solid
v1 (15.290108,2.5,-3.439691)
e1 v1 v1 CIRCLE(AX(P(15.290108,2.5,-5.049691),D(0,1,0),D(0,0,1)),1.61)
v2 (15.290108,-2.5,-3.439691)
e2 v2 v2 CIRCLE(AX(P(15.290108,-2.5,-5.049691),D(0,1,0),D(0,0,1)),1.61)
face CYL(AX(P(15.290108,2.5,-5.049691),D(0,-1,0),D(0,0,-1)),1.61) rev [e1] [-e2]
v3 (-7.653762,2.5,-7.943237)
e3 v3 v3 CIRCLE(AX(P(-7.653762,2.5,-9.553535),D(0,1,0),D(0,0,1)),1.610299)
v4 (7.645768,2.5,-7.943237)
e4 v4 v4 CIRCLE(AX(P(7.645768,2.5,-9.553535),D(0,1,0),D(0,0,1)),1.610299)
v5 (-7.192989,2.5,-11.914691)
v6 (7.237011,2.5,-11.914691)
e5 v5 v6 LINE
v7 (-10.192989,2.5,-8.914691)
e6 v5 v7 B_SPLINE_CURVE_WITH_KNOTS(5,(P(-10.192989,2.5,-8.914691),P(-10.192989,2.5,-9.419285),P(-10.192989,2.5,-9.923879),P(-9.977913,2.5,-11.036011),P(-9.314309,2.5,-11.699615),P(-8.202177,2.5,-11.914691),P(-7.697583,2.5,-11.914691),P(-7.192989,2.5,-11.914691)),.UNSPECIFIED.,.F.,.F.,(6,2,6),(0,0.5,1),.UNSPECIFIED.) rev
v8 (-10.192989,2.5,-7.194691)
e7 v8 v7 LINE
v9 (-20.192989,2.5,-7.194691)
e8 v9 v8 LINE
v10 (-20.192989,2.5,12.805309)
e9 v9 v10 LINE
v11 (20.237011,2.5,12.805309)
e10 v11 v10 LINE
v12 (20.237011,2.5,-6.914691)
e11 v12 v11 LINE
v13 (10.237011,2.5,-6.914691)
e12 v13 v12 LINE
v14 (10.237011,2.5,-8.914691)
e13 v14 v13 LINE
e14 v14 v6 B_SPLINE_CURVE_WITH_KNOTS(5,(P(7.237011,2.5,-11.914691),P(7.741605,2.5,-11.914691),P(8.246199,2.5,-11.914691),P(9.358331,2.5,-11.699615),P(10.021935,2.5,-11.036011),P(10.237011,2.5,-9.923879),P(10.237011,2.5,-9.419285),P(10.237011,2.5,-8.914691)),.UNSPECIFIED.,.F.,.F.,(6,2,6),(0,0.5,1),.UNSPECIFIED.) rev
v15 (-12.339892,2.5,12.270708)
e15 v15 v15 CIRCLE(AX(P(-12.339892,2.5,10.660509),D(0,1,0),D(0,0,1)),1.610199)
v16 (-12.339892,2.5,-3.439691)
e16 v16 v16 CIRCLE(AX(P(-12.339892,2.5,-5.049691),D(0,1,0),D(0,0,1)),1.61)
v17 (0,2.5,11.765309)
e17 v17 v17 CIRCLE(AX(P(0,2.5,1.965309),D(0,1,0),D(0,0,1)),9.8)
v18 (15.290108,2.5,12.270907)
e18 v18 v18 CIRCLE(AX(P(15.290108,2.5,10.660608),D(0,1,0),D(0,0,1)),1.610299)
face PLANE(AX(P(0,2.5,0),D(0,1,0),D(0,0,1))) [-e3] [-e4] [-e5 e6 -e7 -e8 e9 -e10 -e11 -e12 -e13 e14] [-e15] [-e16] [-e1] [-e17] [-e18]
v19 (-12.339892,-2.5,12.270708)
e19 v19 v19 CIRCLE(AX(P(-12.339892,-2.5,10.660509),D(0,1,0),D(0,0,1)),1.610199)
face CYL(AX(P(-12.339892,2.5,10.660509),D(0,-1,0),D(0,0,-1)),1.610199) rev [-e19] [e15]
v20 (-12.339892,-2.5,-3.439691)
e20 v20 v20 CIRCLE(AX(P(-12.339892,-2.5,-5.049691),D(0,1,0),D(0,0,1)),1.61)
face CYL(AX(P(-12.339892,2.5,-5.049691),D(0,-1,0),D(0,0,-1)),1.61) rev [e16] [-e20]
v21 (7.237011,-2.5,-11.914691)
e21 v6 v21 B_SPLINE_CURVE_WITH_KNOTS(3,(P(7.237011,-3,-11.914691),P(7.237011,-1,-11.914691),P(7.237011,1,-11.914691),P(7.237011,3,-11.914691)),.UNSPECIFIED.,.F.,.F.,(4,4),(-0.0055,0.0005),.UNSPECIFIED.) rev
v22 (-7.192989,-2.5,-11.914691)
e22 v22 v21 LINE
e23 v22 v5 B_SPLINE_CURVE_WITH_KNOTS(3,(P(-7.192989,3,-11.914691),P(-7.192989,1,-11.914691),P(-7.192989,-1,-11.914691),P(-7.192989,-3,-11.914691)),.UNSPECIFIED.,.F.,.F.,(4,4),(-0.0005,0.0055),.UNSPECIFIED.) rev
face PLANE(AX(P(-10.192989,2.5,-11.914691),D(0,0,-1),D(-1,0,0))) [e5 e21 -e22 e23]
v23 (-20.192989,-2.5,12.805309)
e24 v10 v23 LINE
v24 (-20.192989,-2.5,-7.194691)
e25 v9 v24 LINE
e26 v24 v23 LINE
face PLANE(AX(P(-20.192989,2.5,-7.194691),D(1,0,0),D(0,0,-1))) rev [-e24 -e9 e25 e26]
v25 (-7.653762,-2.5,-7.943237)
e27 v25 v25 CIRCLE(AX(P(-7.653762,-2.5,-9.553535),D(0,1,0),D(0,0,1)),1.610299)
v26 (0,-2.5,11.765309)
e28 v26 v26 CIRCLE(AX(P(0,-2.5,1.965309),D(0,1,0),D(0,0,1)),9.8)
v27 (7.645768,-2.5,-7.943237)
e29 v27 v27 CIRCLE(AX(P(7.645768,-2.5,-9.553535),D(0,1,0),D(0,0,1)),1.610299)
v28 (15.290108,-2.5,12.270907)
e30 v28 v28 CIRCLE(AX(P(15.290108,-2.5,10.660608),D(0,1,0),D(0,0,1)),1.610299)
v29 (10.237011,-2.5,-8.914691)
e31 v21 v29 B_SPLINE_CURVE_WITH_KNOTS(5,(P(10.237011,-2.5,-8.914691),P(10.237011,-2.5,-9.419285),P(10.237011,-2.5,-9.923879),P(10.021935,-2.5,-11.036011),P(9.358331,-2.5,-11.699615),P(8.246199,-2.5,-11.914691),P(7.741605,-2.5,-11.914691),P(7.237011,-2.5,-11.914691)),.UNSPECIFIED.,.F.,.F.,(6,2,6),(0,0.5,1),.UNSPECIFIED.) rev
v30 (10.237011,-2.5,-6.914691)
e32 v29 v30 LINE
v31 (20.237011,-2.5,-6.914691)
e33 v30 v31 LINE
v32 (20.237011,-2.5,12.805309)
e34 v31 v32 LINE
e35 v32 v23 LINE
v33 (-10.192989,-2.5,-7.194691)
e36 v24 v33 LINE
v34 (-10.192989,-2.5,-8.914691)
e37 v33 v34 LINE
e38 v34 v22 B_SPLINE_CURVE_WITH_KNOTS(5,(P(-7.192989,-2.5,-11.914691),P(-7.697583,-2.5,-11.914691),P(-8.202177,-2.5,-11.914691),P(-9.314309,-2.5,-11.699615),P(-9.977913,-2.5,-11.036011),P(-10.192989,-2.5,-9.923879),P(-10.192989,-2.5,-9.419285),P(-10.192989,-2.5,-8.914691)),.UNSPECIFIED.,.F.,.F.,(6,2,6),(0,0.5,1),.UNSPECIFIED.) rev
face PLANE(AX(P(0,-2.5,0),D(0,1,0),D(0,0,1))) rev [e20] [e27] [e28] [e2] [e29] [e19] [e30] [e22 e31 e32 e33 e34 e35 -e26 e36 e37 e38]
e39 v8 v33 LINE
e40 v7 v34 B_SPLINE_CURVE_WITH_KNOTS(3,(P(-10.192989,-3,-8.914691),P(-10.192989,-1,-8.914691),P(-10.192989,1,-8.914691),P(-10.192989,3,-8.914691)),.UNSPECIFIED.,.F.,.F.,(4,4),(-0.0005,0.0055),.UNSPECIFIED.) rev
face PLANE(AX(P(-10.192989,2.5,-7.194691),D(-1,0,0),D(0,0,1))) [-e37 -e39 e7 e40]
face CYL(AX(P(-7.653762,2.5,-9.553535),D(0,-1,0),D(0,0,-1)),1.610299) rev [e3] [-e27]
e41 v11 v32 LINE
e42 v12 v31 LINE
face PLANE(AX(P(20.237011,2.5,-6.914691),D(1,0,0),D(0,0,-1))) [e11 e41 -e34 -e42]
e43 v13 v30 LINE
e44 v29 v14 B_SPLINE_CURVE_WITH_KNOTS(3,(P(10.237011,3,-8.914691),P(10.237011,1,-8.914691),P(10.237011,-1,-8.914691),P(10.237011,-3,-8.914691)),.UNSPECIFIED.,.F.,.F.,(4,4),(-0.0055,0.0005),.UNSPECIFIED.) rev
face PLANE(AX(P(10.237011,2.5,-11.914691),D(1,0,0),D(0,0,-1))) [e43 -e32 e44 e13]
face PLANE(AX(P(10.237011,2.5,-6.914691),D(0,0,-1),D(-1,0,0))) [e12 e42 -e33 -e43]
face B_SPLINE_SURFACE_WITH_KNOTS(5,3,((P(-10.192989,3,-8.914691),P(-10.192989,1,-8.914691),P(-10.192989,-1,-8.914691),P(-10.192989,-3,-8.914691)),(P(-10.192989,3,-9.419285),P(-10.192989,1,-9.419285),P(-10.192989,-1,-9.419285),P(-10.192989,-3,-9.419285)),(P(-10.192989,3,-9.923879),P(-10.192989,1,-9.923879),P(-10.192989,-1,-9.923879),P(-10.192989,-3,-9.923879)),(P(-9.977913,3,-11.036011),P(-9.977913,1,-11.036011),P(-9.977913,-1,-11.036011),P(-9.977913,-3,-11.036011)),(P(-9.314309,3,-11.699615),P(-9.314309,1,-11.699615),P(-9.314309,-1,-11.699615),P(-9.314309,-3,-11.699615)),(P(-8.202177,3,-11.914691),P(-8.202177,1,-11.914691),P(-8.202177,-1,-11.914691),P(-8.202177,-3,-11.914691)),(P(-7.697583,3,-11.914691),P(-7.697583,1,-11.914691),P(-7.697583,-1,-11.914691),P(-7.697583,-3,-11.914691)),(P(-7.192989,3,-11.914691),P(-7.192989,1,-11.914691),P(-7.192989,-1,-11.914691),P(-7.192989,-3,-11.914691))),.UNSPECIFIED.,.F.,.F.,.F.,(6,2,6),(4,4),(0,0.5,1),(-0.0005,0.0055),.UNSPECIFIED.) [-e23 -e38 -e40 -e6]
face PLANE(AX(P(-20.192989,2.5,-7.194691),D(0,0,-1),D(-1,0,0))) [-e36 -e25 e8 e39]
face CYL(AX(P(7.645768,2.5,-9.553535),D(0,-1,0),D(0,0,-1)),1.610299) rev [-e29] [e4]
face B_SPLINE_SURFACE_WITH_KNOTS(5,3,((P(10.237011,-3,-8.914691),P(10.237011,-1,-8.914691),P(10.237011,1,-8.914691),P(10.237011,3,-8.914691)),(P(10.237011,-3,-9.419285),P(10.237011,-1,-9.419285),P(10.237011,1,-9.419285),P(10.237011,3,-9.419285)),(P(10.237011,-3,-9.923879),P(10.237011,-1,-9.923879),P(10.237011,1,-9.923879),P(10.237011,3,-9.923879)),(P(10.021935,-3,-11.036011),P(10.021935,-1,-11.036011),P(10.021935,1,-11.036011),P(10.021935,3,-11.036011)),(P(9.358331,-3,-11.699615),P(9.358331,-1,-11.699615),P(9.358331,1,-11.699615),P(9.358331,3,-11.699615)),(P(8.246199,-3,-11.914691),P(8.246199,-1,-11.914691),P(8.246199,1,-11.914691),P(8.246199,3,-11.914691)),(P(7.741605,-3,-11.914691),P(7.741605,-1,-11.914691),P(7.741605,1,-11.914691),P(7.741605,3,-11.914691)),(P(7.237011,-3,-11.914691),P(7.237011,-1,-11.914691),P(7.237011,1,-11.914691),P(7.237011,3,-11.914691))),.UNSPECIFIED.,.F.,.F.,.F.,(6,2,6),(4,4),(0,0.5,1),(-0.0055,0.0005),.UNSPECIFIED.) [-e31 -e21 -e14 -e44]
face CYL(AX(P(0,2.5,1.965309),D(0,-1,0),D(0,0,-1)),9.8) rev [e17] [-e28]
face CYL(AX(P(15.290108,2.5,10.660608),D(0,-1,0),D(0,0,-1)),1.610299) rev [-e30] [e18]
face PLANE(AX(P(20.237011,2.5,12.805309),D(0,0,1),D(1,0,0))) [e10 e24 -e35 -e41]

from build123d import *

# Parameters (mm, degrees)
CROQUIS1_R              = 9.8
CROQUIS1_R_2            = 1.61
CROQUIS1_R_3            = 1.610199264
CROQUIS1_R_4            = 1.610298895
SALIENTE_EXTRUIR3_DEPTH = 2.5
REDONDEO1_SIZE          = 3
REDONDEO2_SIZE          = 3


with BuildPart() as part:
    # Croquis1 → Saliente-Extruir3 (new, symmetric)
    with BuildSketch(Plane(origin=(0, 0, 0), x_dir=(1, 0, 0), z_dir=(0, 1, 0))):
        Polygon((-20.192989013, 7.194690523), (-10.192989013, 7.194690523), (-10.192989013, 11.914690523), (10.237010987, 11.914690523), (10.237010987, 6.914690523), (20.237010987, 6.914690523), (20.237010987, -12.805309477), (-20.192989013, -12.805309477), align=None)
        with Locations(Location((0, -1.965309477, 0), (0, 0, 270))):
            Circle(CROQUIS1_R, mode=Mode.SUBTRACT)
        with Locations(Location((-12.339891833, 5.049690523, 0), (0, 0, 270))):
            Circle(CROQUIS1_R_2, mode=Mode.SUBTRACT)
        with Locations(Location((-12.339891833, -10.660508741, 0), (0, 0, 270))):
            Circle(CROQUIS1_R_3, mode=Mode.SUBTRACT)
        with Locations(Location((15.290108167, 5.049690523, 0), (0, 0, 270))):
            Circle(CROQUIS1_R_2, mode=Mode.SUBTRACT)
        with Locations(Location((15.290108167, -10.660608373, 0), (0, 0, 270))):
            Circle(CROQUIS1_R_4, mode=Mode.SUBTRACT)
        with Locations(Location((-7.653762012, 9.553535498, 0), (0, 0, 270))):
            Circle(CROQUIS1_R_4, mode=Mode.SUBTRACT)
        with Locations(Location((7.645768396, 9.553535498, 0), (0, 0, 270))):
            Circle(CROQUIS1_R_4, mode=Mode.SUBTRACT)
    extrude(amount=SALIENTE_EXTRUIR3_DEPTH, both=True)

    # Redondeo1
    # a fillet whose section is not a circle: 3 mm, written as the material it takes off along each edge
    with BuildSketch(Plane(origin=(10.237010987, 10, -11.914690523), x_dir=(0, 0, 1), z_dir=(0, -1, 0))) as redondeo1_piece_1:
        with BuildLine():
            add(Edge.make_bspline([(REDONDEO1_SIZE, 0), (REDONDEO1_SIZE * 0.831801948466, 0), (REDONDEO1_SIZE * 0.663603896932, 0), (REDONDEO1_SIZE * 0.292893218813, REDONDEO1_SIZE * 0.0716919198361), (REDONDEO1_SIZE * 0.0716919198361, REDONDEO1_SIZE * 0.292893218813), (0, REDONDEO1_SIZE * 0.663603896932), (0, REDONDEO1_SIZE * 0.831801948466), (0, REDONDEO1_SIZE)], knots=[0, 0, 0, 0, 0, 0, 0.5, 0.5, 1, 1, 1, 1, 1, 1], degree=5))
            Line((0, REDONDEO1_SIZE), (0, 0))
            Line((0, 0), (REDONDEO1_SIZE, 0))
        make_face()
    extrude(amount=20, mode=Mode.SUBTRACT)

    # Redondeo2
    # a fillet whose section is not a circle: 3 mm, written as the material it takes off along each edge
    with BuildSketch(Plane(origin=(-10.192989013, 10, -11.914690523), x_dir=(0, 0, 1), z_dir=(0, -1, 0))) as redondeo2_piece_1:
        with BuildLine():
            add(Edge.make_bspline([(REDONDEO2_SIZE, 0), (REDONDEO2_SIZE * 0.831801948466, 0), (REDONDEO2_SIZE * 0.663603896932, 0), (REDONDEO2_SIZE * 0.292893218813, -REDONDEO2_SIZE * 0.0716919198361), (REDONDEO2_SIZE * 0.0716919198361, -REDONDEO2_SIZE * 0.292893218813), (0, -REDONDEO2_SIZE * 0.663603896932), (0, -REDONDEO2_SIZE * 0.831801948466), (0, -REDONDEO2_SIZE)], knots=[0, 0, 0, 0, 0, 0, 0.5, 0.5, 1, 1, 1, 1, 1, 1], degree=5))
            Line((0, -REDONDEO2_SIZE), (0, 0))
            Line((0, 0), (REDONDEO2_SIZE, 0))
        make_face()
    extrude(amount=20, mode=Mode.SUBTRACT)


solid = part.part
